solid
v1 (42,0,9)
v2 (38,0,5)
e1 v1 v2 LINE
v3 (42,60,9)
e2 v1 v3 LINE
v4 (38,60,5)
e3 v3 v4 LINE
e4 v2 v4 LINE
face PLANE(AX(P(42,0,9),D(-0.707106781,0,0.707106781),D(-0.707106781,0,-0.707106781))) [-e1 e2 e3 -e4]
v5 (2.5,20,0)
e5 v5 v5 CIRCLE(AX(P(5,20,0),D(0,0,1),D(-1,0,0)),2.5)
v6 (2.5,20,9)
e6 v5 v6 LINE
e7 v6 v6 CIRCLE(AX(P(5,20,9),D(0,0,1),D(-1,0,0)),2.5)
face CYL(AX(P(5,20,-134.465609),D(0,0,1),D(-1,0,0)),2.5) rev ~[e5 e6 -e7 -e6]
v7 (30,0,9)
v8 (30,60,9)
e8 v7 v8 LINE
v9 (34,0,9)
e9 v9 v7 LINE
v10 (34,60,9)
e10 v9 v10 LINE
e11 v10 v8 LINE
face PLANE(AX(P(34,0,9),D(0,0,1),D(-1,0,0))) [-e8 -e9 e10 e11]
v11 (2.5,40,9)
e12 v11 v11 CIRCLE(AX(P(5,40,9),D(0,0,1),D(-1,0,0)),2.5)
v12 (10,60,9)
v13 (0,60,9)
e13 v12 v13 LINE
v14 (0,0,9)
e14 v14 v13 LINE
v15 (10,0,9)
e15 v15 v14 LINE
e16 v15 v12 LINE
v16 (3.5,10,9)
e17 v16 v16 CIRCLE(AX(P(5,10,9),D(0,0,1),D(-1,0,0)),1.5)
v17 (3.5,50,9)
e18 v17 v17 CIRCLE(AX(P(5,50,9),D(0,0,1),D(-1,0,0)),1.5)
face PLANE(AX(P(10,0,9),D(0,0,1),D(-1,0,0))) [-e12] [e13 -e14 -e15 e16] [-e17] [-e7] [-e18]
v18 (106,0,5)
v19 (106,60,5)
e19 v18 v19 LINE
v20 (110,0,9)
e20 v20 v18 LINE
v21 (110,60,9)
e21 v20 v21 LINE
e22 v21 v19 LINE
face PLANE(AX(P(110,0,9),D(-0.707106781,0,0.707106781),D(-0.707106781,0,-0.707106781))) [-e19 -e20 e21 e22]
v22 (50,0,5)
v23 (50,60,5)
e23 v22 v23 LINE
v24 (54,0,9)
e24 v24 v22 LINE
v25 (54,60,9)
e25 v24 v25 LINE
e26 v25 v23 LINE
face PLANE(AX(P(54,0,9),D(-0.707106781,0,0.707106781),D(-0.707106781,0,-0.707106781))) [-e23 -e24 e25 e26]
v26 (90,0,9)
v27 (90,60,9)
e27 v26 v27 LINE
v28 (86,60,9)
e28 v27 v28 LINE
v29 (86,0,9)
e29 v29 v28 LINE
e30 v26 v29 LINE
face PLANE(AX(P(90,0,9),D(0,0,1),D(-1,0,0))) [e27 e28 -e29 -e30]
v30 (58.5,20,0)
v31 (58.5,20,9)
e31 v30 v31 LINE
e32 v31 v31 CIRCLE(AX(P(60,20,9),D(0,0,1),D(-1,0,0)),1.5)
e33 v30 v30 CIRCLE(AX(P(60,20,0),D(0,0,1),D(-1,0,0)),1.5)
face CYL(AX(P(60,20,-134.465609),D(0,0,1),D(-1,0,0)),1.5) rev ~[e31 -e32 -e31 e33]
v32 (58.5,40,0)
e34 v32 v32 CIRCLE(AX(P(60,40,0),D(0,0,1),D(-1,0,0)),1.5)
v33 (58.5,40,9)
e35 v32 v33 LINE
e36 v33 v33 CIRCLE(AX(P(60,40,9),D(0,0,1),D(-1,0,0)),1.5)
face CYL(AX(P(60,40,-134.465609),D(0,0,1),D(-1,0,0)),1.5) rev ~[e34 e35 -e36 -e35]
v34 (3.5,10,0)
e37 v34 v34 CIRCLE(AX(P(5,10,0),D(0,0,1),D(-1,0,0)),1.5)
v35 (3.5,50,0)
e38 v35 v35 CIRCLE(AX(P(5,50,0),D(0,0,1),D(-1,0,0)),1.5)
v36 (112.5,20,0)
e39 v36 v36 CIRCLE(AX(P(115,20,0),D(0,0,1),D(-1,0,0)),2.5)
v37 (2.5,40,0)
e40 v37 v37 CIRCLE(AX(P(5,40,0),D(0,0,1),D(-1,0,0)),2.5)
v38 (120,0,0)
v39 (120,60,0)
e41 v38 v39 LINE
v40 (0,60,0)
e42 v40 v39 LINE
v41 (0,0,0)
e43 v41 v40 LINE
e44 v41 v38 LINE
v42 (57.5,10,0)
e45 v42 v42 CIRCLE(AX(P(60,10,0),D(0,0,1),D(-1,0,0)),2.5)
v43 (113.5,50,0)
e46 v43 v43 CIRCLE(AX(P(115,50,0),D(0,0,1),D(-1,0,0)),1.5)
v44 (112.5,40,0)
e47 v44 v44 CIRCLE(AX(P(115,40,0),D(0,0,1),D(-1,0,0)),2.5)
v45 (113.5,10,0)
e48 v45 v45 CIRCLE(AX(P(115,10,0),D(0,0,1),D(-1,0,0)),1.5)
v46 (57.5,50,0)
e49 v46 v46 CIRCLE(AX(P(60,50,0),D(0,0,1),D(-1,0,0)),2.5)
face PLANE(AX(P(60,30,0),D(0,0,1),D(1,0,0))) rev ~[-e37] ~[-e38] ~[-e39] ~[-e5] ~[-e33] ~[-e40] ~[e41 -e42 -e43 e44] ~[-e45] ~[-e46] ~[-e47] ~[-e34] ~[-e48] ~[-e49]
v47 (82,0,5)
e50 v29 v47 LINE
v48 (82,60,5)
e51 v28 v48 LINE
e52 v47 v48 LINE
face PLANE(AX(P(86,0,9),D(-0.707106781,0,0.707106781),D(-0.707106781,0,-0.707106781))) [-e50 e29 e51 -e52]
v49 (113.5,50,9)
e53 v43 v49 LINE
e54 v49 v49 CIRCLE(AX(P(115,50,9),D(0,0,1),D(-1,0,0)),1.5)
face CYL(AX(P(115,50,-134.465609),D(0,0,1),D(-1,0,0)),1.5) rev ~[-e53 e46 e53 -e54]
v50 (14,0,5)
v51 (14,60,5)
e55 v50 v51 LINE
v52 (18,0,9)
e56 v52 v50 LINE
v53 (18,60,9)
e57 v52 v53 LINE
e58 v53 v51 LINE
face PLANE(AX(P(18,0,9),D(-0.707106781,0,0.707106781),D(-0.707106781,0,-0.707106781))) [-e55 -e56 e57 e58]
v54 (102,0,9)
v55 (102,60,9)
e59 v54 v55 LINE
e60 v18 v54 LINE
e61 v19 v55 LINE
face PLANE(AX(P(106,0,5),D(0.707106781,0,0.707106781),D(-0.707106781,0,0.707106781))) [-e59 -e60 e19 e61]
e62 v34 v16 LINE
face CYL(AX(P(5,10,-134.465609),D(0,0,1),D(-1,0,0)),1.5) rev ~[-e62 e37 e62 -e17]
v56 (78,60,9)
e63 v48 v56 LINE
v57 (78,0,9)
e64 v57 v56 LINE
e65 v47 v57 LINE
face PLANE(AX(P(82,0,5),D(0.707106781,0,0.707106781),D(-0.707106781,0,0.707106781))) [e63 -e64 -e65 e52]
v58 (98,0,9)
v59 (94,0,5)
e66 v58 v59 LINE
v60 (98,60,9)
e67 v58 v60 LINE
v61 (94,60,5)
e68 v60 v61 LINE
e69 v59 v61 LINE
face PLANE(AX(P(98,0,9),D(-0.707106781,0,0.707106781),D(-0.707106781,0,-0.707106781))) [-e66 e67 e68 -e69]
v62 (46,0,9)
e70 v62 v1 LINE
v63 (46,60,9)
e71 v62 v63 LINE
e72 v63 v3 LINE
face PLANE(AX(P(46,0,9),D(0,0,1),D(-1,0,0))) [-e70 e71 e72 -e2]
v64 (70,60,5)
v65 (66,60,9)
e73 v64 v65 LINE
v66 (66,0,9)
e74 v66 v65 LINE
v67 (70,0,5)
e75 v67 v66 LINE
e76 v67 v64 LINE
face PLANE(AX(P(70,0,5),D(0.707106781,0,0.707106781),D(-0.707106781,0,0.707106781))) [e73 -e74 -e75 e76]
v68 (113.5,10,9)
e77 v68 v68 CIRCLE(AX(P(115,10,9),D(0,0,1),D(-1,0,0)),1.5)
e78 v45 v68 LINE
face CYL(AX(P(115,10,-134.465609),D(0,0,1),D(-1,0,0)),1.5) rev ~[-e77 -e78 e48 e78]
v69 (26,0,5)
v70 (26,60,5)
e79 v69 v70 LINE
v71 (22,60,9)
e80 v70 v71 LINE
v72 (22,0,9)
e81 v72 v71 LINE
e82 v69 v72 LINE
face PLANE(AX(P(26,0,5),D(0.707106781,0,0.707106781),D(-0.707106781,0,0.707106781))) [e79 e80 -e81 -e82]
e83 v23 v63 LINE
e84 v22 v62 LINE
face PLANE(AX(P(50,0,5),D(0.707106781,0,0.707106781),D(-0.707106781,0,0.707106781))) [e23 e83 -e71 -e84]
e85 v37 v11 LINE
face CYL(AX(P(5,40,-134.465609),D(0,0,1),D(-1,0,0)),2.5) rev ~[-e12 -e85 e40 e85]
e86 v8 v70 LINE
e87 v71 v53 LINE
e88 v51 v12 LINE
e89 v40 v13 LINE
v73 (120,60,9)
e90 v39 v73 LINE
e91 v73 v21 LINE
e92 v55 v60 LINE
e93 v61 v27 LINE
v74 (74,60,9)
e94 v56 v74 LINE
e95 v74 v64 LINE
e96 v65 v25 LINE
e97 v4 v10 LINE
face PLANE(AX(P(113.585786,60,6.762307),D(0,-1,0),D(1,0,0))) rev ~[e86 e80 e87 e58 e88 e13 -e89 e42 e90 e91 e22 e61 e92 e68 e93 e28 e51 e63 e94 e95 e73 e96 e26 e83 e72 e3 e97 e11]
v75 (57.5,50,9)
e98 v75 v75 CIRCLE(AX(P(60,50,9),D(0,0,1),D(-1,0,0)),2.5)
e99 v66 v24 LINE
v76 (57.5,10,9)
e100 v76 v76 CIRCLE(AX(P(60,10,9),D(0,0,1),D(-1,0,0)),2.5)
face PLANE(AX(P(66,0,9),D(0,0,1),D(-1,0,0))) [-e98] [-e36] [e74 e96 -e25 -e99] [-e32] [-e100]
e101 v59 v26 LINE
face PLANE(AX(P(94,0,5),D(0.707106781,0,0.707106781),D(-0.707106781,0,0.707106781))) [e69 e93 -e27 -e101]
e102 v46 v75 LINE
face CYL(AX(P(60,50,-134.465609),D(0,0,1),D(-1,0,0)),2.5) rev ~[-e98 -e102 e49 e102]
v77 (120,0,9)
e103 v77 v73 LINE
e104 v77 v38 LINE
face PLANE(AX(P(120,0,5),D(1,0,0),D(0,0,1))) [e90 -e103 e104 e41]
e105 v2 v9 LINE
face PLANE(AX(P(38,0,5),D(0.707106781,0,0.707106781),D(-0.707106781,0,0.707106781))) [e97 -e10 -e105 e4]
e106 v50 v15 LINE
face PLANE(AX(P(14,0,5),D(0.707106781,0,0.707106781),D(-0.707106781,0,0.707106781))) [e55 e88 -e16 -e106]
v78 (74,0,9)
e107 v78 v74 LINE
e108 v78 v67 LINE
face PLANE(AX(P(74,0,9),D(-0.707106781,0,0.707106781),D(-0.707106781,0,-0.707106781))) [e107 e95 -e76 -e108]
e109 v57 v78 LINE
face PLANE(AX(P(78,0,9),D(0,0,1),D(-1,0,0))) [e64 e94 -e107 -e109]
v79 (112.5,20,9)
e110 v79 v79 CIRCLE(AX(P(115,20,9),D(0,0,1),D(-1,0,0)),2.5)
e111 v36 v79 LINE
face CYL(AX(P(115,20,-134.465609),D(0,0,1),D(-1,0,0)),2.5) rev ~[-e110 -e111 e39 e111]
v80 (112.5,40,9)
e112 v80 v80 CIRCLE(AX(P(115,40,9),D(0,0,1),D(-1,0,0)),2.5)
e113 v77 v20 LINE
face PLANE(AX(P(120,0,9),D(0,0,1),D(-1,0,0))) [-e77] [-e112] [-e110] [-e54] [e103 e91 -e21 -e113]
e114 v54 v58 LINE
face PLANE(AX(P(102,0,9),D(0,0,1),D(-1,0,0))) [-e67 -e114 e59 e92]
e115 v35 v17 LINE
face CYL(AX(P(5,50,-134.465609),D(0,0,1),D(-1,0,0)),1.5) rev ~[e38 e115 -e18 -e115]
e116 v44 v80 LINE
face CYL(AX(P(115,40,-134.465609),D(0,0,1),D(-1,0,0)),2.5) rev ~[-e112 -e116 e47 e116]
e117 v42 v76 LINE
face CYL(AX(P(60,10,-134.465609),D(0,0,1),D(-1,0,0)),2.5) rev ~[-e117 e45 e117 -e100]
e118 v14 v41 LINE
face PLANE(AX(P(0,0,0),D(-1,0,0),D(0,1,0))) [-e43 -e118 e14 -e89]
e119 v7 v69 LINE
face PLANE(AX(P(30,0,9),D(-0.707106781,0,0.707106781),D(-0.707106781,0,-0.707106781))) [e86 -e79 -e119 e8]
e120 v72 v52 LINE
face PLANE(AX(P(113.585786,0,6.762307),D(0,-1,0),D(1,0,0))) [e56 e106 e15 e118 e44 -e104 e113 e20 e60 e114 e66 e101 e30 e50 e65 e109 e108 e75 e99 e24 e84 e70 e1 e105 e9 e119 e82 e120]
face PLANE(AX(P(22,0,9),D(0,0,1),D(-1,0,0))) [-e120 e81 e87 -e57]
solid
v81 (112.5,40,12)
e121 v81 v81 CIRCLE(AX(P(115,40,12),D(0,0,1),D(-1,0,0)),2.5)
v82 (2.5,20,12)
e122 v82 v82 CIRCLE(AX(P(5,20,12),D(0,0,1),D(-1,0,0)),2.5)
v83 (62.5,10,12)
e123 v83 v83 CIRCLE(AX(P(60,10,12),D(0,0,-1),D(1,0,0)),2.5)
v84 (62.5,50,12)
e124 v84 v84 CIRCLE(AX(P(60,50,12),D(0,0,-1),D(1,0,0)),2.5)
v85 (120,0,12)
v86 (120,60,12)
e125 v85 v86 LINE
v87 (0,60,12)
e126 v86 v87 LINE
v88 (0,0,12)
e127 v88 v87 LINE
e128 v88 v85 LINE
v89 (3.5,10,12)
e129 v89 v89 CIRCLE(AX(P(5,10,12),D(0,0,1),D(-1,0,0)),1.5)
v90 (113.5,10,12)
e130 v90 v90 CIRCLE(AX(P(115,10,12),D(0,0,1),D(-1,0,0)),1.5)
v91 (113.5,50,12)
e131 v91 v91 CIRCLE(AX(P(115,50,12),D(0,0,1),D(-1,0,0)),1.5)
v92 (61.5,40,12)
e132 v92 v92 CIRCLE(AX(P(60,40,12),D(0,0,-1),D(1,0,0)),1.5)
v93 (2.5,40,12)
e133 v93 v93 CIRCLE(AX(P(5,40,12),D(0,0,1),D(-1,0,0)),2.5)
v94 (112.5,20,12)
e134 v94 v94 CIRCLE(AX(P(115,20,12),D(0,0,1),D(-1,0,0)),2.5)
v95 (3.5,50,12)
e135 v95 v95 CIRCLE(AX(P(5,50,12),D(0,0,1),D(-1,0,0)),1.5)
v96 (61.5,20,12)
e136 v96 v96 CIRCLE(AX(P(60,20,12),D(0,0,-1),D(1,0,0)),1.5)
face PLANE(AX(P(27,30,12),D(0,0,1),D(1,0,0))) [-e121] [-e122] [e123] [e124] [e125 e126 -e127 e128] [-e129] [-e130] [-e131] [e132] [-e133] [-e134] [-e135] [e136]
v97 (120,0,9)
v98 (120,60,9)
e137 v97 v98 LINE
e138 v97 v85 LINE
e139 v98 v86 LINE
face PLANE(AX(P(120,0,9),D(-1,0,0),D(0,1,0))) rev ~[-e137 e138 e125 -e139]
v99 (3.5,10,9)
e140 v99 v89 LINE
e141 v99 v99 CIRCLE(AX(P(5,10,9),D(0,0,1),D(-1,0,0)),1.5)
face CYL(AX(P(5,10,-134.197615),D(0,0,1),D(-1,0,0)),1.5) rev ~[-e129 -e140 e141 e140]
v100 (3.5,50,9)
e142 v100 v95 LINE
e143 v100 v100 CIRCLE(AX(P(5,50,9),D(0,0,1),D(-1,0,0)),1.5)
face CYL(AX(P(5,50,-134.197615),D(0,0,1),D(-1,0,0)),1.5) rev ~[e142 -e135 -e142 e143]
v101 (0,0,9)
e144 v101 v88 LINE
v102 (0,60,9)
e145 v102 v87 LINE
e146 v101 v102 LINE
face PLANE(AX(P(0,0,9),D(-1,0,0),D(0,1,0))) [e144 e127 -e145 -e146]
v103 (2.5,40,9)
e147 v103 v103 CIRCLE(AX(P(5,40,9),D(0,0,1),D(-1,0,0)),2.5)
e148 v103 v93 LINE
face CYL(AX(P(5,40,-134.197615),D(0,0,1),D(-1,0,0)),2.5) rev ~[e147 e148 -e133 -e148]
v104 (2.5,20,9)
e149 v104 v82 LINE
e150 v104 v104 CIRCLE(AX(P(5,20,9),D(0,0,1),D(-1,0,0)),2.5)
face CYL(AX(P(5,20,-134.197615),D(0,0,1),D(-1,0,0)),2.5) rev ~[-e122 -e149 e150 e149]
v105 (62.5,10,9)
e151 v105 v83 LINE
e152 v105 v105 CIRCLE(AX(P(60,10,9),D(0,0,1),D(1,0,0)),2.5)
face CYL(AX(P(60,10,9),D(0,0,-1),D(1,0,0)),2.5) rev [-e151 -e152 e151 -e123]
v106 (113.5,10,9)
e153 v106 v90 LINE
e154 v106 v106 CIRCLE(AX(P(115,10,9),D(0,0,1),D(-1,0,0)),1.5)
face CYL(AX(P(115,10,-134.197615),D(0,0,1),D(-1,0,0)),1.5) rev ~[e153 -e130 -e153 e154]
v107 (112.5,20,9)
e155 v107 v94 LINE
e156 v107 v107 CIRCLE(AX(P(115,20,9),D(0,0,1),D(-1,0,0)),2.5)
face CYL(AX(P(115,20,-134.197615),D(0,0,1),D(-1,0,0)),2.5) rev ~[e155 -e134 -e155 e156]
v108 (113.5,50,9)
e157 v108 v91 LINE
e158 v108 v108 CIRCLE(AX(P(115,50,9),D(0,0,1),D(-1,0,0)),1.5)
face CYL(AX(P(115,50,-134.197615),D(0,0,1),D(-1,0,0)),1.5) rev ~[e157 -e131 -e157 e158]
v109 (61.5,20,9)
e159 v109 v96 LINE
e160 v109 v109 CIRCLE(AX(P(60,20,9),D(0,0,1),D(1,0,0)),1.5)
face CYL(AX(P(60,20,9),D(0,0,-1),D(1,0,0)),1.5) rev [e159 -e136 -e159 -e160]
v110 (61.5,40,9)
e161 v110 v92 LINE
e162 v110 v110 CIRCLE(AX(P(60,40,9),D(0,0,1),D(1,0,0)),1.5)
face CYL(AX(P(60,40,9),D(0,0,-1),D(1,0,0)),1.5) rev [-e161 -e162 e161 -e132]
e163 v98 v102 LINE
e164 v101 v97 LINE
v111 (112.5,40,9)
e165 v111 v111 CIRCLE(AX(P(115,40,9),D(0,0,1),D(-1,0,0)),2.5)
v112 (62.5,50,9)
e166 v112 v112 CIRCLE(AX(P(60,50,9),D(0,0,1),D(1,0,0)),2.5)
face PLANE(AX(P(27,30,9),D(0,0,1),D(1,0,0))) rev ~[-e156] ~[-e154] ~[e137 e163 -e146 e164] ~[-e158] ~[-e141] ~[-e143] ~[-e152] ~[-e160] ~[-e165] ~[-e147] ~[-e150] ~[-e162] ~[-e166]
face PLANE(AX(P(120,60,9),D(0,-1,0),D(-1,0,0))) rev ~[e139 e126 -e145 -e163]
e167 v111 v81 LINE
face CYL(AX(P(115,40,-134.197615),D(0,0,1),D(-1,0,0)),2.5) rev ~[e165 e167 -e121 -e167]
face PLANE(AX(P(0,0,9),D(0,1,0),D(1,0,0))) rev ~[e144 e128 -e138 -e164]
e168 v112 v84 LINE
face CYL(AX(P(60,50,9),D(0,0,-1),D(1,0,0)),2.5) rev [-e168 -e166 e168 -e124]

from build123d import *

# Parameters (mm, degrees)
F0_W     = 120
F0_H     = 60
F1_DEPTH = 5
F3_DEPTH = 60
F4_D     = 5
F5_D     = 5
F6_D     = 3
F7_W     = 54
F7_H     = 60
F7_W_2   = 12
F7_R     = 2.5
F7_R_2   = 1.5
F8_DEPTH = 3
F9_D     = 3
F10_D    = 5


with BuildPart() as f1:
    # F0 (on Top) → F1 (new body)
    with BuildSketch(Plane.XY):
        with Locations((60, 30)):
            Rectangle(F0_W, F0_H)
    extrude(amount=F1_DEPTH)

    # F2 (on face) → F3 (join)
    with BuildSketch(Plane.XZ):
        Polygon((106, 5), (120, 5), (120, 9), (110, 9), align=None)
        Polygon((94, 5), (106, 5), (102, 9), (98, 9), align=None)
        Polygon((82, 5), (94, 5), (90, 9), (86, 9), align=None)
        Polygon((70, 5), (82, 5), (78, 9), (74, 9), align=None)
        Polygon((54, 9), (50, 5), (70, 5), (66, 9), align=None)
        Polygon((42, 9), (38, 5), (50, 5), (46, 9), align=None)
        Polygon((30, 9), (26, 5), (38, 5), (34, 9), align=None)
        Polygon((18, 9), (14, 5), (26, 5), (22, 9), align=None)
        Polygon((0, 9), (0, 5), (14, 5), (10, 9), align=None)
    extrude(amount=-F3_DEPTH)

    # F4 (through all)
    with Locations(Plane(origin=(0, 0, 0), x_dir=(1, 0, 0), z_dir=(0, 0, -1))):
        with Locations((115, -20), (115, -40), (5, -20), (5, -40)):
            Hole(F4_D / 2)

    # F5 (through all)
    with Locations(Plane(origin=(0, 0, 0), x_dir=(1, 0, 0), z_dir=(0, 0, -1))):
        with Locations((60, -50), (60, -10)):
            Hole(F5_D / 2)

    # F6 (through all)
    with Locations(Plane(origin=(0, 0, 0), x_dir=(1, 0, 0), z_dir=(0, 0, -1))):
        with Locations((5, -50), (5, -10), (60, -40), (60, -20), (115, -10), (115, -50)):
            Hole(F6_D / 2)


with BuildPart() as f8:
    # F7 (on face) → F8 (new body)
    with BuildSketch(Plane.XY.offset(9)):
        with Locations((27, 30)):
            Rectangle(F7_W, F7_H)
        with Locations((93, 30)):
            Rectangle(F7_W, F7_H)
        with Locations((60, 30)):
            Rectangle(F7_W_2, F7_H)
        with Locations((60, 10)):
            Circle(F7_R, mode=Mode.SUBTRACT)
        with Locations((60, 20)):
            Circle(F7_R_2, mode=Mode.SUBTRACT)
        with Locations((60, 40)):
            Circle(F7_R_2, mode=Mode.SUBTRACT)
        with Locations((60, 50)):
            Circle(F7_R, mode=Mode.SUBTRACT)
    extrude(amount=F8_DEPTH)

    # F9 (through all)
    with Locations(Plane(origin=(0, 0, 0), x_dir=(1, 0, 0), z_dir=(0, 0, -1))):
        with Locations((115, -10), (115, -50), (60, -40), (60, -20), (5, -10), (5, -50)):
            Hole(F9_D / 2)

    # F10 (through all)
    with Locations(Plane(origin=(0, 0, 0), x_dir=(1, 0, 0), z_dir=(0, 0, -1))):
        with Locations((115, -20), (115, -40), (60, -50), (60, -10), (5, -20), (5, -40)):
            Hole(F10_D / 2)


solid = Compound([f1.part, f8.part])
